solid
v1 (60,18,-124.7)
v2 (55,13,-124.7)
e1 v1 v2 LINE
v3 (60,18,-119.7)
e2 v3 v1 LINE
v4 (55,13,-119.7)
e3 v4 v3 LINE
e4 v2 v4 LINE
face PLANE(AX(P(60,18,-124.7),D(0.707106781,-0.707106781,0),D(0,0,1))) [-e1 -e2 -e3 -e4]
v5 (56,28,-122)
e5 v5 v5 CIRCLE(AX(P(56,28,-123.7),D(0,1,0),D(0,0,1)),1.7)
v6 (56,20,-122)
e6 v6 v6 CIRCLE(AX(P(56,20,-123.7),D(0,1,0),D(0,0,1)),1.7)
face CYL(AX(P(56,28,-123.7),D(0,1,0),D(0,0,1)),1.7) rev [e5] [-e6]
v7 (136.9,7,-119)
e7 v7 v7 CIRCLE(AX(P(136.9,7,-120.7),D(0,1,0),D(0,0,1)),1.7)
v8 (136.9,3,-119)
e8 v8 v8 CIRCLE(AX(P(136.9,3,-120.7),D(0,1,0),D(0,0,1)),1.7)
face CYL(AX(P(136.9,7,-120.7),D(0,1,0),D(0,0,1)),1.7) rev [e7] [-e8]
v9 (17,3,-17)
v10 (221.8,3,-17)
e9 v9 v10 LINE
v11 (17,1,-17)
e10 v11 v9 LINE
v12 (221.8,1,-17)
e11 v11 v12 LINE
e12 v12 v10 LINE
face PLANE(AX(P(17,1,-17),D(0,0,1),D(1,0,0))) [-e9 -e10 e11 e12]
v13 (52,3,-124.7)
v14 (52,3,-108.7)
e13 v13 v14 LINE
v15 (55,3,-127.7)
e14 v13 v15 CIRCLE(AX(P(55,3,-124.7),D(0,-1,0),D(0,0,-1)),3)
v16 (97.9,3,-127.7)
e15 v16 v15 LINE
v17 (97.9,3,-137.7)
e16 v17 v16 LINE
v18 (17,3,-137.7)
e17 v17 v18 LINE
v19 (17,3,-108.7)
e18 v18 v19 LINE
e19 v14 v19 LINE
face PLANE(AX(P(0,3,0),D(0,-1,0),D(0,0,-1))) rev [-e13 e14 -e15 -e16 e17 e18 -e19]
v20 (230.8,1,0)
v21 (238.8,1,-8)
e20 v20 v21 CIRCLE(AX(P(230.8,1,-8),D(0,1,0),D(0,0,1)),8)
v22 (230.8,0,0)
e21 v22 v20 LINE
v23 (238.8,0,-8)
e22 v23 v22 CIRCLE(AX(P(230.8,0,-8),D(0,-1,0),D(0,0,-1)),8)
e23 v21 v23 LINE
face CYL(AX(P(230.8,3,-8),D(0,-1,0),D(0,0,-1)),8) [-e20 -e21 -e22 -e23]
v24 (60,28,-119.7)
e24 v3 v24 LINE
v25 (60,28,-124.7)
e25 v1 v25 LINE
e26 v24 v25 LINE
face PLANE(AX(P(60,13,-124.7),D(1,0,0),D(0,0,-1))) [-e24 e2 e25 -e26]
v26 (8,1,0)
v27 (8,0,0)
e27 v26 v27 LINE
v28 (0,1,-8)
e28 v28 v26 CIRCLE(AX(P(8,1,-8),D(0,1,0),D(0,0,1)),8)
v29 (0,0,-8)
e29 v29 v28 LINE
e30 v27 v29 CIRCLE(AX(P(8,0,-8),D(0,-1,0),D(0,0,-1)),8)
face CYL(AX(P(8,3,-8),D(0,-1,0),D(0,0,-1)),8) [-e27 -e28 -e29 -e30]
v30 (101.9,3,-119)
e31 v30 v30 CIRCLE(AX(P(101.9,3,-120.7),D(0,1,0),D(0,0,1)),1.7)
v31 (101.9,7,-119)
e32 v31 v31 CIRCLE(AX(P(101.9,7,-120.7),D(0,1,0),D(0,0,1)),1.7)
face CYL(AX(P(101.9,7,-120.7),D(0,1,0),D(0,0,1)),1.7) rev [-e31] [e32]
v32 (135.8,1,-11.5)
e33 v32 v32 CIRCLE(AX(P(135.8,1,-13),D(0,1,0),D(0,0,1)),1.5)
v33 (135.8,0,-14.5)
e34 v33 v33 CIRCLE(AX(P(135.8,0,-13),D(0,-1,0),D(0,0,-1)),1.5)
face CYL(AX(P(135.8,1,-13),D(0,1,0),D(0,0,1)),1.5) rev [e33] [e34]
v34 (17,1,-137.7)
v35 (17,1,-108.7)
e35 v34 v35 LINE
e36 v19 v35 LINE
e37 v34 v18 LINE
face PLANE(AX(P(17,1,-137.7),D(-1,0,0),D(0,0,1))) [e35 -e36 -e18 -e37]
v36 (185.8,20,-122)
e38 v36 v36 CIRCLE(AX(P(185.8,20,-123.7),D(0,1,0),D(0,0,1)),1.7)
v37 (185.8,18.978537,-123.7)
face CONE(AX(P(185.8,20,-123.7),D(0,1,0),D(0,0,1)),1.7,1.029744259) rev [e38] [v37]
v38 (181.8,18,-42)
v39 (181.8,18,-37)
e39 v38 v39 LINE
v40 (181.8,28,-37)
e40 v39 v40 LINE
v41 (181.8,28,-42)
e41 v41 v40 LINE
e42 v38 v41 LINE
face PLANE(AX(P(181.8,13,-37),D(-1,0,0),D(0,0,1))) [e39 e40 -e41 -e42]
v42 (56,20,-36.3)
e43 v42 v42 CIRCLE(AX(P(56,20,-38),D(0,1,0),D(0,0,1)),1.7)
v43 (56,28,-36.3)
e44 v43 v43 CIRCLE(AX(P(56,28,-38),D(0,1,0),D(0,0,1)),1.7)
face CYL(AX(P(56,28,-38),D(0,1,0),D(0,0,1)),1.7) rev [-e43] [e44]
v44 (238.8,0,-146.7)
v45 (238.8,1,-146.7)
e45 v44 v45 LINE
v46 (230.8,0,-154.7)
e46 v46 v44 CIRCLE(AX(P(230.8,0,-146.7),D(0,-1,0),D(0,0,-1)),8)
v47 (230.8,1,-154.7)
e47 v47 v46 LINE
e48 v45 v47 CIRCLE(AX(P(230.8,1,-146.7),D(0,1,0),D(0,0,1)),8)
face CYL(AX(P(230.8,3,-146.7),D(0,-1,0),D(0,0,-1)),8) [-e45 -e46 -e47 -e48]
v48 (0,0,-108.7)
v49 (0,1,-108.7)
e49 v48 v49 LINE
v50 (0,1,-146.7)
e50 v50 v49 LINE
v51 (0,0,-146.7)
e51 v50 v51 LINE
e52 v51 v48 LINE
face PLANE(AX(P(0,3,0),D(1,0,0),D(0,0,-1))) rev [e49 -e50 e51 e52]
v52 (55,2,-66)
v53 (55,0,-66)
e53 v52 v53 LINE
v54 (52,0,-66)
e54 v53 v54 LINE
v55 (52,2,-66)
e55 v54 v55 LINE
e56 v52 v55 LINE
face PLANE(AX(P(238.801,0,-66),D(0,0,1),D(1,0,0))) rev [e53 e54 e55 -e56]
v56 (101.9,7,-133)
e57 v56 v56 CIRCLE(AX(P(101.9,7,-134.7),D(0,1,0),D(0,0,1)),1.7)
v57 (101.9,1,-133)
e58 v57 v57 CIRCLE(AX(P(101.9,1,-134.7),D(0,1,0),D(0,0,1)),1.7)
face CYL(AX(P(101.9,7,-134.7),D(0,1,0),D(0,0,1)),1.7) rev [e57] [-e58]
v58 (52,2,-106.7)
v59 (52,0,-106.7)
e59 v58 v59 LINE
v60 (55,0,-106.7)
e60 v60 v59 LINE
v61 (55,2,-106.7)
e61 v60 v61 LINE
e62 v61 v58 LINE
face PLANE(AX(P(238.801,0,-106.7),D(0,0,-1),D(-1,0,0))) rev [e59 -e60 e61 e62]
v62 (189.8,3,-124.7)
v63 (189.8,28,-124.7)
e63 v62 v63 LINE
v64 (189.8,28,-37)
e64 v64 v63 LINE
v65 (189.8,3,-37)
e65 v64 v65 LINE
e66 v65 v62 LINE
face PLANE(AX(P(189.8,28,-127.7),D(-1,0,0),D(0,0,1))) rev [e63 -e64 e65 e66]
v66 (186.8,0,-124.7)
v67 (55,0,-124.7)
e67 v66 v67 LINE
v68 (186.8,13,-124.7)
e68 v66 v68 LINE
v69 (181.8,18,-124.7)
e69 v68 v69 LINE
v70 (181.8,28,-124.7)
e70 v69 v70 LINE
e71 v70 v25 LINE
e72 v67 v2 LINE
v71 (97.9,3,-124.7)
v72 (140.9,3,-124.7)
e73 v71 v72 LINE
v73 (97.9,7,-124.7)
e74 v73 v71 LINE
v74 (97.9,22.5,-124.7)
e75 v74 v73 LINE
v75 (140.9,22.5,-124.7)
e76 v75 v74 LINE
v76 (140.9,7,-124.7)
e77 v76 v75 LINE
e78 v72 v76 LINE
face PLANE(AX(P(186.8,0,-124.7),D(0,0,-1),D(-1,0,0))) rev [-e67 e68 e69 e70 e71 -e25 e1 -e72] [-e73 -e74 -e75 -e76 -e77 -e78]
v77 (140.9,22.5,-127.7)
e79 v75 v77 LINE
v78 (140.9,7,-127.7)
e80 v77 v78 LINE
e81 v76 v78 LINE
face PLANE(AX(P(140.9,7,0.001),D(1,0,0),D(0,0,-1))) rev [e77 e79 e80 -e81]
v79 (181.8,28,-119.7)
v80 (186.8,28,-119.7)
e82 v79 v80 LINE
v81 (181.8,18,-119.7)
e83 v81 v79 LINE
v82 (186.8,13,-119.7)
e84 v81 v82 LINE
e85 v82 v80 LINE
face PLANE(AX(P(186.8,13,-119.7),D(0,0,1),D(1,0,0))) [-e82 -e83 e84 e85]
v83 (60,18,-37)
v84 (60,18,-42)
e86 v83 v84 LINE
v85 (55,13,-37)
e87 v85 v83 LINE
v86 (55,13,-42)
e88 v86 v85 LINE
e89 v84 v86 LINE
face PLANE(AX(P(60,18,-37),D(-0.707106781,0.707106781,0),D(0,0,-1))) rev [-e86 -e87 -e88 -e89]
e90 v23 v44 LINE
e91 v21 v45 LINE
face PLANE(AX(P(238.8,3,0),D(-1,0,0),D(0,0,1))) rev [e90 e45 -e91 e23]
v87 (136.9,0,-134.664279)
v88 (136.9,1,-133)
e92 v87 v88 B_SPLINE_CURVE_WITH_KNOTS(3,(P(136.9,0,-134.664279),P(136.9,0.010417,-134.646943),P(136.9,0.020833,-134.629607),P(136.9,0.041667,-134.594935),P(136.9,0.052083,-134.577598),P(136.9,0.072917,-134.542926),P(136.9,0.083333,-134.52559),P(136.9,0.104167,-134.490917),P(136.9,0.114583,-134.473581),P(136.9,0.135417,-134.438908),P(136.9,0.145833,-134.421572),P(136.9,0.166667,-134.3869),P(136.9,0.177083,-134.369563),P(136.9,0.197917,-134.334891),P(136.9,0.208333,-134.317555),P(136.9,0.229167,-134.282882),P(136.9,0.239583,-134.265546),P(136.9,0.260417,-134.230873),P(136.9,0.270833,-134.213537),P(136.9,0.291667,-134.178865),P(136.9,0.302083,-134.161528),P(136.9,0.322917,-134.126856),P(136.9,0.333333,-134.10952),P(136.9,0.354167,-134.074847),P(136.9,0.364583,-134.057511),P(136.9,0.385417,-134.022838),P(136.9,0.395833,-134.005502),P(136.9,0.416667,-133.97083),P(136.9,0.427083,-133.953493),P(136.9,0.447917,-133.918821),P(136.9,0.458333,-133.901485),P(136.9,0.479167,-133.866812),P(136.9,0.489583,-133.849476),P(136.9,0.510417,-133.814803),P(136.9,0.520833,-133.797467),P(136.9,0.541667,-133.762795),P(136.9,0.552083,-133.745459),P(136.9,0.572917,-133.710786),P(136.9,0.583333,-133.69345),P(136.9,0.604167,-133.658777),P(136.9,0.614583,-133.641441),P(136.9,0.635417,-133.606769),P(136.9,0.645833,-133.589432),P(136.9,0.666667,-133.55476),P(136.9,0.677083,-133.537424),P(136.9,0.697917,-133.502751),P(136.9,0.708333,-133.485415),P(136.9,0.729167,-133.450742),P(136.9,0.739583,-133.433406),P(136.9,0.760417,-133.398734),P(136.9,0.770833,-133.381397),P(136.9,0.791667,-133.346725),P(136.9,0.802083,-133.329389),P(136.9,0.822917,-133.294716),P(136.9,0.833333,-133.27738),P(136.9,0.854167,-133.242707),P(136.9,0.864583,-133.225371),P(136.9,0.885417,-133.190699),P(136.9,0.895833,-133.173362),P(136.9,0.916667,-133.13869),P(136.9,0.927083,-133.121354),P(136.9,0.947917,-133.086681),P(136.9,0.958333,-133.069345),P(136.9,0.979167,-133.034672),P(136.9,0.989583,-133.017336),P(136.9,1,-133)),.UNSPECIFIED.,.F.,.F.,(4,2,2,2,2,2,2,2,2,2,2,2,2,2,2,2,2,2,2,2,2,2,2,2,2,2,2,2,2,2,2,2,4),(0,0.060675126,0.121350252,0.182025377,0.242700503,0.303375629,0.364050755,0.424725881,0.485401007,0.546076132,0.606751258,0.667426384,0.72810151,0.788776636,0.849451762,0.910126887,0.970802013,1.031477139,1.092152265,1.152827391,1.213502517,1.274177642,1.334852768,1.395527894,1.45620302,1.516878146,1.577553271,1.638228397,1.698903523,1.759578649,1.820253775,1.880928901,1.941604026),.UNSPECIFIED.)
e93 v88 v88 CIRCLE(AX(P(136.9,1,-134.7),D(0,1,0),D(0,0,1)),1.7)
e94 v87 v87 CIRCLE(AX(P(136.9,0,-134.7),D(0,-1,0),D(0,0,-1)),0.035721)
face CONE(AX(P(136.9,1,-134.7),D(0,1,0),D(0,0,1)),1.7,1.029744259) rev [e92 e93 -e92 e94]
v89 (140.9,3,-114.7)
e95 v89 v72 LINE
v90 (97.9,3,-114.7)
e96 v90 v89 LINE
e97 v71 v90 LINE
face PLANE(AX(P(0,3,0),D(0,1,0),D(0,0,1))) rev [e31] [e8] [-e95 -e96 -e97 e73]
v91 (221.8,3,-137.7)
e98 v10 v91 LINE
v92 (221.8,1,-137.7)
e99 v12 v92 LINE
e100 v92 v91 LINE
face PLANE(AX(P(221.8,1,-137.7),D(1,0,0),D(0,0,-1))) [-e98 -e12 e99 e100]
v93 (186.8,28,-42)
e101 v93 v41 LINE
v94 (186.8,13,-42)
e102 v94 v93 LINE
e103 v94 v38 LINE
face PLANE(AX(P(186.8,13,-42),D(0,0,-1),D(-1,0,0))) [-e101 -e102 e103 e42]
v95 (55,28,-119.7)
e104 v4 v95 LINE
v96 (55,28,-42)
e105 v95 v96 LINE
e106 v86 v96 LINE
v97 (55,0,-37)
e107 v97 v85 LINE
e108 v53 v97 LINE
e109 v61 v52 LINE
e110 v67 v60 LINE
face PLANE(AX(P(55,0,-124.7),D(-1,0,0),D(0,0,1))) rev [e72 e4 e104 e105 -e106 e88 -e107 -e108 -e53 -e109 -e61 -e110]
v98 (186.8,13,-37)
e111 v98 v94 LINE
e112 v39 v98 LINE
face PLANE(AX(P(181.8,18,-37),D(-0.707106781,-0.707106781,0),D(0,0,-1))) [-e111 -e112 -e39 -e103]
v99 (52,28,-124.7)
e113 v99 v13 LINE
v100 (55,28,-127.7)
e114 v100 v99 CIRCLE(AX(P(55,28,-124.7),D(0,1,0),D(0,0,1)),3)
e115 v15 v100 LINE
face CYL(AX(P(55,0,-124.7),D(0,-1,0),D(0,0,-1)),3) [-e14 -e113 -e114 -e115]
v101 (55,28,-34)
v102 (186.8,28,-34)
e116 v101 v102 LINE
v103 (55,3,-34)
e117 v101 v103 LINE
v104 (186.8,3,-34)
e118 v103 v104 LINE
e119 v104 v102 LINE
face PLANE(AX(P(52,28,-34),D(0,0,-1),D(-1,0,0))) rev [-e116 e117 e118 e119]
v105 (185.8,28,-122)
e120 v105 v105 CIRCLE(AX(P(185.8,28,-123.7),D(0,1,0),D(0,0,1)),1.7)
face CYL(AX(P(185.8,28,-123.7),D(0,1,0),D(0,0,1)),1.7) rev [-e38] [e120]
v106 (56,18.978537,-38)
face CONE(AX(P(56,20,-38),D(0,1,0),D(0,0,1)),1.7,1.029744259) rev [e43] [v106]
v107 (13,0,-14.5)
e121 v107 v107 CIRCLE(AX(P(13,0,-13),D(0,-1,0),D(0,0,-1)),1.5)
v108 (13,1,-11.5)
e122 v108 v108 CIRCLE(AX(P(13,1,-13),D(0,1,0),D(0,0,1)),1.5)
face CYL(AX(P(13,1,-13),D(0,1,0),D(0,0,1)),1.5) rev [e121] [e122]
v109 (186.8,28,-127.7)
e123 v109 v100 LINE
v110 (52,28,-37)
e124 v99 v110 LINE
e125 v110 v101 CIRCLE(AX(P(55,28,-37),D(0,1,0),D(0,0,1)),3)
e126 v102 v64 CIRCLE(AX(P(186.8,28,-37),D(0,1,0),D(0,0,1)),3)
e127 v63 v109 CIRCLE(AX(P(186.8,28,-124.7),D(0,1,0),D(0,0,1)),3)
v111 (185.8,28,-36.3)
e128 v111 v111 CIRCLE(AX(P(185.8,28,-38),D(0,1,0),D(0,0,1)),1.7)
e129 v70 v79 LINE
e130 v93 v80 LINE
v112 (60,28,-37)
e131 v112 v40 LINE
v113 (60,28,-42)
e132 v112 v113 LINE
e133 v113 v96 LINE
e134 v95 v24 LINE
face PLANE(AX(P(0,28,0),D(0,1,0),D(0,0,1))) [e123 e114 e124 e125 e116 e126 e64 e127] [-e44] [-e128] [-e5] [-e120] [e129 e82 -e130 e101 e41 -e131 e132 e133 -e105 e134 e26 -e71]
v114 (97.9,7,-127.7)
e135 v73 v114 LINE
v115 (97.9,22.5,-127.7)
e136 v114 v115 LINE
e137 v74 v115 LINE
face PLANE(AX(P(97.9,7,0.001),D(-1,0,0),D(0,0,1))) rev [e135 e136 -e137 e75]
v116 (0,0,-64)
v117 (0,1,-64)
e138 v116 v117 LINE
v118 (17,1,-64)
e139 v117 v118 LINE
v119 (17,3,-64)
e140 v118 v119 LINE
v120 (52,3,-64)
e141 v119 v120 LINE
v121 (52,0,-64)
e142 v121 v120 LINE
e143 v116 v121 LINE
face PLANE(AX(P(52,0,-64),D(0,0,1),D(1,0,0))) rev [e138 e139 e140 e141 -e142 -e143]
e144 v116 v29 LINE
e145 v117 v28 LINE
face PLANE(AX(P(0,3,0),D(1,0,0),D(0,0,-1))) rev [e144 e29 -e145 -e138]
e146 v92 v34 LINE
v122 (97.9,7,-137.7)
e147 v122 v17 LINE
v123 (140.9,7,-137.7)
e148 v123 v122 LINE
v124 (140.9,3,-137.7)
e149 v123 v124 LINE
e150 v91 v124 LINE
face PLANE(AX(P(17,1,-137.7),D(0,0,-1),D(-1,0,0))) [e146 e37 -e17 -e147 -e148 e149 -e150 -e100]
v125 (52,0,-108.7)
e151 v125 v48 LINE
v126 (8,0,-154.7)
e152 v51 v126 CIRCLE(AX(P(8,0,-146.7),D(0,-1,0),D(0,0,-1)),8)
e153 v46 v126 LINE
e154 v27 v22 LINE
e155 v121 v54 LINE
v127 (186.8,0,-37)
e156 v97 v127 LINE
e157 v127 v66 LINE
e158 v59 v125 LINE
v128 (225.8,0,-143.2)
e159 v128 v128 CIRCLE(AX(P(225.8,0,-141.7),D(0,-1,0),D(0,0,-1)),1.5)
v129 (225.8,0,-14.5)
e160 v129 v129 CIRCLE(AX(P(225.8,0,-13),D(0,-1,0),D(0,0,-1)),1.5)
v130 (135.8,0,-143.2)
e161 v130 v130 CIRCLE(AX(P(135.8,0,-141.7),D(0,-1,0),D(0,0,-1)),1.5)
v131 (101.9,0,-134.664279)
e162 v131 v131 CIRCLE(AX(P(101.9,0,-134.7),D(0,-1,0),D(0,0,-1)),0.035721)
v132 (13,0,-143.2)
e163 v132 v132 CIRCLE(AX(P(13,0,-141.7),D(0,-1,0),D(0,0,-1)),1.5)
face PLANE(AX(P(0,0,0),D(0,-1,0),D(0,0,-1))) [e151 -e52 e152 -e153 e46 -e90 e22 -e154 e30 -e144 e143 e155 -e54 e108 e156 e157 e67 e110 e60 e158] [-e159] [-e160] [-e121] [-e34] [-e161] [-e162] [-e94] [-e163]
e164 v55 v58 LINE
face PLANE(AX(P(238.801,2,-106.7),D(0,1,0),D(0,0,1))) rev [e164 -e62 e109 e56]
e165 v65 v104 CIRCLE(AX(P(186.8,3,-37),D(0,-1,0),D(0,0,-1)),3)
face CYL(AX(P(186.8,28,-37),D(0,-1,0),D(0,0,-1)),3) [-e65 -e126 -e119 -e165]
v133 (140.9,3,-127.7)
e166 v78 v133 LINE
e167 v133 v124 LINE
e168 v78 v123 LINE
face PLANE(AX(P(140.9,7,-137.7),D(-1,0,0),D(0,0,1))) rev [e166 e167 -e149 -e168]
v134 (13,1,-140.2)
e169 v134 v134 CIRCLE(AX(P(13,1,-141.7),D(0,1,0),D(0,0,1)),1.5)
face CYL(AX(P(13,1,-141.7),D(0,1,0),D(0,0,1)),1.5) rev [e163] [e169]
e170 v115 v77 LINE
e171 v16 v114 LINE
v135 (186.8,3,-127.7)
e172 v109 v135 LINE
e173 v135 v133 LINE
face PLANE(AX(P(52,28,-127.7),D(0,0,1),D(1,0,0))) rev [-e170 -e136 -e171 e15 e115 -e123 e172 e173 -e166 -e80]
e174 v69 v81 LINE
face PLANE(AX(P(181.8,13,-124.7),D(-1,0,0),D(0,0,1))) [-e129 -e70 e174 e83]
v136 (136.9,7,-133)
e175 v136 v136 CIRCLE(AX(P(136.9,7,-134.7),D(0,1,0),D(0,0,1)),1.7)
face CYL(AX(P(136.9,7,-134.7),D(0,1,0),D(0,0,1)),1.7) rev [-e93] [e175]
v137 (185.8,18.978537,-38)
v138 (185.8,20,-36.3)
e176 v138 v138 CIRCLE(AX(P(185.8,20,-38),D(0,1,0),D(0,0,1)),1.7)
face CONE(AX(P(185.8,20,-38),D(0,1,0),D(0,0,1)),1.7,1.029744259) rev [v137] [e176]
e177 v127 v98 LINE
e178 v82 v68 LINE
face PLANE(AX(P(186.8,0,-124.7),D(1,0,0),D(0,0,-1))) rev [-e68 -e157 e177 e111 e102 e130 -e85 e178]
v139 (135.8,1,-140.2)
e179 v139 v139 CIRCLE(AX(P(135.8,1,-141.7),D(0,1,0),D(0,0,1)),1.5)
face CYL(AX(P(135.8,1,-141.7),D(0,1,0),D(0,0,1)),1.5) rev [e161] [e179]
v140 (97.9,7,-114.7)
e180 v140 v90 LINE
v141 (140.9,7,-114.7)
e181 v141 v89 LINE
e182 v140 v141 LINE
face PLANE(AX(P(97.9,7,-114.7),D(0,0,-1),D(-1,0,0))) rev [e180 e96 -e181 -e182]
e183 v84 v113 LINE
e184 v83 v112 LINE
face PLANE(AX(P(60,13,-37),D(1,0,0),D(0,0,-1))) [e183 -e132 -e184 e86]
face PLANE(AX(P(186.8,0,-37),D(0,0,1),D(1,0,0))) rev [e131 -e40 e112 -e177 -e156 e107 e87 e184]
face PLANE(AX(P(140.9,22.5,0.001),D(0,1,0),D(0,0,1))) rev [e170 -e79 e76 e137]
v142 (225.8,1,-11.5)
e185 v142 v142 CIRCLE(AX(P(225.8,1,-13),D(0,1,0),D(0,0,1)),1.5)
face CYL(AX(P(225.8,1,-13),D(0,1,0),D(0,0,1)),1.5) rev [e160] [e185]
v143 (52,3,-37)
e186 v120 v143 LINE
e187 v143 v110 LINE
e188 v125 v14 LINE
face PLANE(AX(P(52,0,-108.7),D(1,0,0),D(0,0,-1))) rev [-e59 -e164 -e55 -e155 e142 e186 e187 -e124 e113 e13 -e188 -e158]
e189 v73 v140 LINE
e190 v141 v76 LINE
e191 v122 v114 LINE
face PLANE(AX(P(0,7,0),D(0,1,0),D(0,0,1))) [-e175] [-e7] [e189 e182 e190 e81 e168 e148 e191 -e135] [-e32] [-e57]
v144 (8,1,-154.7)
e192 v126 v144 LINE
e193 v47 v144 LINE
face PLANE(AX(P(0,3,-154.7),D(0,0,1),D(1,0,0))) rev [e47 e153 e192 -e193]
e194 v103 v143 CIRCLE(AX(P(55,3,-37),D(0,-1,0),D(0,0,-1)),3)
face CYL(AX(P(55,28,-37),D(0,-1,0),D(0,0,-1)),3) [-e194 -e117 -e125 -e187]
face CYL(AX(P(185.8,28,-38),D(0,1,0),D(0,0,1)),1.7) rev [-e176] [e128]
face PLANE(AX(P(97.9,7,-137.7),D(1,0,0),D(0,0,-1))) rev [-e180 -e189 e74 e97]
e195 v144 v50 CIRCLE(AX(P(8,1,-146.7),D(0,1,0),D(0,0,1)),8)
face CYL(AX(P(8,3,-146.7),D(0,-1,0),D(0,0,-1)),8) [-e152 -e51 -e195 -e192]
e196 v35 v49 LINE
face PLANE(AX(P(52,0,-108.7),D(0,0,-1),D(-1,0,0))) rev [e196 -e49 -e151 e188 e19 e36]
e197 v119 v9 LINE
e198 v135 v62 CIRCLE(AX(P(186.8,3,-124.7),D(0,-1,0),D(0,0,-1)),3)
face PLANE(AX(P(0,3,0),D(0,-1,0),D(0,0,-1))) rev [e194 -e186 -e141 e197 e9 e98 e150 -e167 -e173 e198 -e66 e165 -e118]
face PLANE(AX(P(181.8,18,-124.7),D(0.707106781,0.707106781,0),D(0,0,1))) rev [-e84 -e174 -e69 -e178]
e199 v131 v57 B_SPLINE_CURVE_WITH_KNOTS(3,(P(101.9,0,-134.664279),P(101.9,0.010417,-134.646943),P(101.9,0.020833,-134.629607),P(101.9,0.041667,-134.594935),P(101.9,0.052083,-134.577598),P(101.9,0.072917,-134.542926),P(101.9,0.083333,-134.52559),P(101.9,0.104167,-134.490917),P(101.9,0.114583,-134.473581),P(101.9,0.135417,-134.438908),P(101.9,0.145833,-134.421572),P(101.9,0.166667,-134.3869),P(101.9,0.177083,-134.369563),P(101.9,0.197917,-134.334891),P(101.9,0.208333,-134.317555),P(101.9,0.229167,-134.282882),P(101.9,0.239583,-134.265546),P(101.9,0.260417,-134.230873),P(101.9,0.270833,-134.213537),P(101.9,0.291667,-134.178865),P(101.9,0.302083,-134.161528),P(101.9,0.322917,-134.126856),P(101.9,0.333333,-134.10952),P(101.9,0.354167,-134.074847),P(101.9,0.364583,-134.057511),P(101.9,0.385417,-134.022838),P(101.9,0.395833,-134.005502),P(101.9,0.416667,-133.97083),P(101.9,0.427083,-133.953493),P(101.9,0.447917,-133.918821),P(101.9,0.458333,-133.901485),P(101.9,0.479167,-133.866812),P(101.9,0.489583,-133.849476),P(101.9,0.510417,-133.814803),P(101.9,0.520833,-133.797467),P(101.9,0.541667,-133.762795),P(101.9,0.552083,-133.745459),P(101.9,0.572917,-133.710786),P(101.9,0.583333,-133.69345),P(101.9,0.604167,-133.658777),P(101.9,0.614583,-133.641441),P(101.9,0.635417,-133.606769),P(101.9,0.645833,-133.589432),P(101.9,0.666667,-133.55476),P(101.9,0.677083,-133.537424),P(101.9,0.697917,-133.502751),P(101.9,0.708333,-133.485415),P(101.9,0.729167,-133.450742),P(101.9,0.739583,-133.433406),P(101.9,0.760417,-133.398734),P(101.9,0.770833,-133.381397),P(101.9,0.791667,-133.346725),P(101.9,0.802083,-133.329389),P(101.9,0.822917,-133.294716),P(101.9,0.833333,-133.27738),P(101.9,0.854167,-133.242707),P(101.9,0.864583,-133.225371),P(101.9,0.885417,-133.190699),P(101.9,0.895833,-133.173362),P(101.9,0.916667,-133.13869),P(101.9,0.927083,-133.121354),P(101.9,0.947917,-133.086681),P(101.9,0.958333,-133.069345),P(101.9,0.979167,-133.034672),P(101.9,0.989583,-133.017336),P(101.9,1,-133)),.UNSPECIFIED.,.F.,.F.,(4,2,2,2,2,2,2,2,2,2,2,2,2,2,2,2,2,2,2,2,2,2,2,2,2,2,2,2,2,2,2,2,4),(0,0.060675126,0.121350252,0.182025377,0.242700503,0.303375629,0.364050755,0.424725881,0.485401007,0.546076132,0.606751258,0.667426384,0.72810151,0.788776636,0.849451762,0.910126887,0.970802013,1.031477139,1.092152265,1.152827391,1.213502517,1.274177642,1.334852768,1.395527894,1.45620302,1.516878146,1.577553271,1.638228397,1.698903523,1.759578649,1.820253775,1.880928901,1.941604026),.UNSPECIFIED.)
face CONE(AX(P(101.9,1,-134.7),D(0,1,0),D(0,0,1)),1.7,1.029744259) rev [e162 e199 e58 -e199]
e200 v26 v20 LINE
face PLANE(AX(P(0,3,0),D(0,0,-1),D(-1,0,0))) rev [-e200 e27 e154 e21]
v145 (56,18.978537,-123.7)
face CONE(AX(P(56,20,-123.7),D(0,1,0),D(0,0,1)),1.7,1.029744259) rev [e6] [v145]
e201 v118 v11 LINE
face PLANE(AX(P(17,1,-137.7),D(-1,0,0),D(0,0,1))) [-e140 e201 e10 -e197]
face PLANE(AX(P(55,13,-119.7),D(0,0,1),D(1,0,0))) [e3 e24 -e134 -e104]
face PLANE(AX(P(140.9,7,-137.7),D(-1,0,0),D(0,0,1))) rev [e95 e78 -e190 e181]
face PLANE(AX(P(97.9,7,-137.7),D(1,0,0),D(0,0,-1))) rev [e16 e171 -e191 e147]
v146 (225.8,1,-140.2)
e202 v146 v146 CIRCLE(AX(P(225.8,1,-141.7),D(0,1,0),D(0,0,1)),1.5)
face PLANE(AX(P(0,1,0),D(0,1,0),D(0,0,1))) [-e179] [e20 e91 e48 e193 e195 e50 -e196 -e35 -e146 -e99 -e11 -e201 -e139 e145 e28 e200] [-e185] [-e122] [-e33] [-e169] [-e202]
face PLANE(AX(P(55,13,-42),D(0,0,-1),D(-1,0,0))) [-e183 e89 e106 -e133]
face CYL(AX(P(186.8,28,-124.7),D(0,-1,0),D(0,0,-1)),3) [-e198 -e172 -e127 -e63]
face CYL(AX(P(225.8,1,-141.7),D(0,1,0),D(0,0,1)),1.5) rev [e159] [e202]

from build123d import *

# Parameters (mm, degrees)
SKIZZE1_W                            = 238.8
SKIZZE1_H                            = 154.7
AUFSATZ_LINEAR_AUSTRAGEN1_DEPTH      = 3
SKIZZE2_W                            = 238.8
SKIZZE2_H                            = 154.7
SKIZZE2_W_2                          = 204.8
SKIZZE2_H_2                          = 120.7
SCHNITT_LINEAR_AUSTRAGEN2_DEPTH      = 2
VERRUNDUNG3_R                        = 8
F_3_0_3_DURCHMESSER_BOHRUNG1_D       = 3
SKIZZE6_W                            = 52
SKIZZE6_H                            = 44.7
SCHNITT_LINEAR_AUSTRAGEN3_DEPTH      = 285.546182543
SKIZZE7_W                            = 131.8
SKIZZE7_H                            = 87.7
SCHNITT_LINEAR_AUSTRAGEN4_DEPTH      = 285.546182543
SKIZZE5_W                            = 137.8
SKIZZE5_H                            = 93.7
SKIZZE5_W_2                          = 131.8
SKIZZE5_H_2                          = 87.7
AUFSATZ_LINEAR_AUSTRAGEN2_DEPTH      = 25
SCHNITT_LINEAR_AUSTRAGEN5_REACH      = 246.152
SKIZZE8_W                            = 40.7
SKIZZE8_H                            = 2
SKIZZE9_W                            = 43
SKIZZE9_H                            = 23
AUFSATZ_LINEAR_AUSTRAGEN3_DEPTH      = 4
F_3_4_3_4_DURCHMESSER_BOHRUNG1_D     = 3.4
F_3_4_3_4_DURCHMESSER_BOHRUNG1_DEPTH = 6
F_3_4_3_4_DURCHMESSER_BOHRUNG1_TIP   = 1.021463052
SCHNITT_LINEAR_AUSTRAGEN6_REACH      = 274.244
SKIZZE12_W                           = 43
SKIZZE12_H                           = 15.5
SKIZZE13_W                           = 5
SKIZZE13_H                           = 5
AUFSATZ_LINEAR_AUSTRAGEN4_DEPTH      = 15
F_3_4_3_4_DURCHMESSER_BOHRUNG2_D     = 3.4
F_3_4_3_4_DURCHMESSER_BOHRUNG2_DEPTH = 8
F_3_4_3_4_DURCHMESSER_BOHRUNG2_TIP   = 1.021463052
FASE1_SIZE                           = 5
VERRUNDUNG4_R                        = 3


with BuildPart() as part:
    # Skizze1 → Aufsatz-Linear austragen1 (new body)
    with BuildSketch(Plane(origin=(0, 0, 0), x_dir=(1, 0, 0), z_dir=(0, 1, 0))):
        with Locations((119.4, 77.35)):
            Rectangle(SKIZZE1_W, SKIZZE1_H)
    extrude(amount=AUFSATZ_LINEAR_AUSTRAGEN1_DEPTH)

    # Skizze2 → Schnitt-Linear austragen2 (cut)
    with BuildSketch(Plane(origin=(0, 3, 0), x_dir=(1, 0, 0), z_dir=(0, 1, 0))):
        with Locations((119.4, 77.35)):
            Rectangle(SKIZZE2_W, SKIZZE2_H)
        with Locations((119.4, 77.35)):
            Rectangle(SKIZZE2_W_2, SKIZZE2_H_2, mode=Mode.SUBTRACT)
    extrude(amount=-SCHNITT_LINEAR_AUSTRAGEN2_DEPTH, mode=Mode.SUBTRACT)

    # Verrundung3
    verrundung3_edges = [part.edges().sort_by_distance(p)[0] for p in [
        (0, 0.5, -154.7),
        (238.8, 0.5, -154.7),
        (238.8, 0.5, 0),
        (0, 0.5, 0),
    ]]
    fillet(verrundung3_edges, radius=VERRUNDUNG3_R)

    # Ø3.0 (3) Durchmesser Bohrung1 (through all)
    with Locations(Plane(origin=(0, 1, 0), x_dir=(1, 0, 0), z_dir=(0, 1, 0))):
        with Locations((13, 13), (135.8, 13), (225.8, 13), (225.8, 141.7), (135.8, 141.7), (13, 141.7)):
            Hole(F_3_0_3_DURCHMESSER_BOHRUNG1_D / 2)

    # Skizze6 → Schnitt-Linear austragen3 (cut, through all)
    with BuildSketch(Plane(origin=(0, 3, 0), x_dir=(1, 0, 0), z_dir=(0, 1, 0))):
        with Locations((26, 86.35)):
            Rectangle(SKIZZE6_W, SKIZZE6_H)
    extrude(amount=-SCHNITT_LINEAR_AUSTRAGEN3_DEPTH, mode=Mode.SUBTRACT)

    # Skizze7 → Schnitt-Linear austragen4 (cut, through all)
    with BuildSketch(Plane(origin=(0, 3, 0), x_dir=(1, 0, 0), z_dir=(0, 1, 0))):
        with Locations((120.9, 80.85)):
            Rectangle(SKIZZE7_W, SKIZZE7_H)
    extrude(amount=-SCHNITT_LINEAR_AUSTRAGEN4_DEPTH, mode=Mode.SUBTRACT)

    # Skizze5 → Aufsatz-Linear austragen2 (add)
    with BuildSketch(Plane(origin=(0, 3, 0), x_dir=(1, 0, 0), z_dir=(0, 1, 0))):
        with Locations((120.9, 80.85)):
            Rectangle(SKIZZE5_W, SKIZZE5_H)
        with Locations((120.9, 80.85)):
            Rectangle(SKIZZE5_W_2, SKIZZE5_H_2, mode=Mode.SUBTRACT)
    extrude(amount=AUFSATZ_LINEAR_AUSTRAGEN2_DEPTH)

    # Skizze8 → Schnitt-Linear austragen5 (cut, up to next)
    with BuildSketch(Plane.ZY.offset(-52), mode=Mode.PRIVATE) as schnitt_linear_austragen5_sk1:
        with Locations((-86.35, 1)):
            Rectangle(SKIZZE8_W, SKIZZE8_H)
    schnitt_linear_austragen5_tool1 = extrude(schnitt_linear_austragen5_sk1.sketch, amount=-SCHNITT_LINEAR_AUSTRAGEN5_REACH, mode=Mode.PRIVATE) & part.part
    add(schnitt_linear_austragen5_tool1.solids().sort_by_distance((52, 1, -86.35))[0], mode=Mode.SUBTRACT)

    # Skizze9 → Aufsatz-Linear austragen3 (add)
    with BuildSketch(Plane(origin=(0, 3, 0), x_dir=(1, 0, 0), z_dir=(0, 1, 0))):
        with Locations((119.4, 126.2)):
            Rectangle(SKIZZE9_W, SKIZZE9_H)
    extrude(amount=AUFSATZ_LINEAR_AUSTRAGEN3_DEPTH)

    # Ø3.4 (3.4) Durchmesser Bohrung1
    with Locations(Plane(origin=(0, 7, 0), x_dir=(1, 0, 0), z_dir=(0, 1, 0))):
        with Locations((101.9, 134.7), (136.9, 134.7), (136.9, 120.7), (101.9, 120.7)):
            Hole(F_3_4_3_4_DURCHMESSER_BOHRUNG1_D / 2, depth=F_3_4_3_4_DURCHMESSER_BOHRUNG1_DEPTH)
            with Locations((0, 0, -(F_3_4_3_4_DURCHMESSER_BOHRUNG1_DEPTH + F_3_4_3_4_DURCHMESSER_BOHRUNG1_TIP / 2))):  # 118° drill point
                Cone(0, F_3_4_3_4_DURCHMESSER_BOHRUNG1_D / 2, F_3_4_3_4_DURCHMESSER_BOHRUNG1_TIP, mode=Mode.SUBTRACT)

    # Skizze12 → Schnitt-Linear austragen6 (cut, up to next)
    with BuildSketch(Plane(origin=(0, 0, -127.7), x_dir=(-1, 0, 0), z_dir=(0, 0, -1)), mode=Mode.PRIVATE) as schnitt_linear_austragen6_sk1:
        with Locations((-119.4, 14.75)):
            Rectangle(SKIZZE12_W, SKIZZE12_H)
    schnitt_linear_austragen6_tool1 = extrude(schnitt_linear_austragen6_sk1.sketch, amount=-SCHNITT_LINEAR_AUSTRAGEN6_REACH, mode=Mode.PRIVATE) & part.part
    add(schnitt_linear_austragen6_tool1.solids().sort_by_distance((119.4, 14.75, -127.7))[0], mode=Mode.SUBTRACT)

    # Skizze13 → Aufsatz-Linear austragen4 (add)
    with BuildSketch(Plane(origin=(0, 28, 0), x_dir=(1, 0, 0), z_dir=(0, 1, 0))):
        with Locations((57.5, 122.2)):
            Rectangle(SKIZZE13_W, SKIZZE13_H)
        with Locations((184.3, 122.2)):
            Rectangle(SKIZZE13_W, SKIZZE13_H)
        with Locations((184.3, 39.5)):
            Rectangle(SKIZZE13_W, SKIZZE13_H)
        with Locations((57.5, 39.5)):
            Rectangle(SKIZZE13_W, SKIZZE13_H)
    extrude(amount=-AUFSATZ_LINEAR_AUSTRAGEN4_DEPTH)

    # Ø3.4 (3.4) Durchmesser Bohrung2
    with Locations(Plane(origin=(0, 28, 0), x_dir=(1, 0, 0), z_dir=(0, 1, 0))):
        with Locations((56, 123.7), (185.8, 123.7), (185.8, 38), (56, 38)):
            Hole(F_3_4_3_4_DURCHMESSER_BOHRUNG2_D / 2, depth=F_3_4_3_4_DURCHMESSER_BOHRUNG2_DEPTH)
            with Locations((0, 0, -(F_3_4_3_4_DURCHMESSER_BOHRUNG2_DEPTH + F_3_4_3_4_DURCHMESSER_BOHRUNG2_TIP / 2))):  # 118° drill point
                Cone(0, F_3_4_3_4_DURCHMESSER_BOHRUNG2_D / 2, F_3_4_3_4_DURCHMESSER_BOHRUNG2_TIP, mode=Mode.SUBTRACT)

    # Fase1
    fase1_edges = [part.edges().sort_by_distance(p)[0] for p in [
        (60, 13, -39.5),
        (181.8, 13, -39.5),
        (181.8, 13, -122.2),
        (60, 13, -122.2),
    ]]
    chamfer(fase1_edges, length=FASE1_SIZE - 0.0001)  # a hair under: the kernel refuses the full size

    # Verrundung4
    verrundung4_edges = [part.edges().sort_by_distance(p)[0] for p in [
        (52, 15.5, -127.7),
        (52, 15.5, -34),
        (189.8, 15.5, -34),
        (189.8, 15.5, -127.7),
    ]]
    fillet(verrundung4_edges, radius=VERRUNDUNG4_R)


solid = part.part
